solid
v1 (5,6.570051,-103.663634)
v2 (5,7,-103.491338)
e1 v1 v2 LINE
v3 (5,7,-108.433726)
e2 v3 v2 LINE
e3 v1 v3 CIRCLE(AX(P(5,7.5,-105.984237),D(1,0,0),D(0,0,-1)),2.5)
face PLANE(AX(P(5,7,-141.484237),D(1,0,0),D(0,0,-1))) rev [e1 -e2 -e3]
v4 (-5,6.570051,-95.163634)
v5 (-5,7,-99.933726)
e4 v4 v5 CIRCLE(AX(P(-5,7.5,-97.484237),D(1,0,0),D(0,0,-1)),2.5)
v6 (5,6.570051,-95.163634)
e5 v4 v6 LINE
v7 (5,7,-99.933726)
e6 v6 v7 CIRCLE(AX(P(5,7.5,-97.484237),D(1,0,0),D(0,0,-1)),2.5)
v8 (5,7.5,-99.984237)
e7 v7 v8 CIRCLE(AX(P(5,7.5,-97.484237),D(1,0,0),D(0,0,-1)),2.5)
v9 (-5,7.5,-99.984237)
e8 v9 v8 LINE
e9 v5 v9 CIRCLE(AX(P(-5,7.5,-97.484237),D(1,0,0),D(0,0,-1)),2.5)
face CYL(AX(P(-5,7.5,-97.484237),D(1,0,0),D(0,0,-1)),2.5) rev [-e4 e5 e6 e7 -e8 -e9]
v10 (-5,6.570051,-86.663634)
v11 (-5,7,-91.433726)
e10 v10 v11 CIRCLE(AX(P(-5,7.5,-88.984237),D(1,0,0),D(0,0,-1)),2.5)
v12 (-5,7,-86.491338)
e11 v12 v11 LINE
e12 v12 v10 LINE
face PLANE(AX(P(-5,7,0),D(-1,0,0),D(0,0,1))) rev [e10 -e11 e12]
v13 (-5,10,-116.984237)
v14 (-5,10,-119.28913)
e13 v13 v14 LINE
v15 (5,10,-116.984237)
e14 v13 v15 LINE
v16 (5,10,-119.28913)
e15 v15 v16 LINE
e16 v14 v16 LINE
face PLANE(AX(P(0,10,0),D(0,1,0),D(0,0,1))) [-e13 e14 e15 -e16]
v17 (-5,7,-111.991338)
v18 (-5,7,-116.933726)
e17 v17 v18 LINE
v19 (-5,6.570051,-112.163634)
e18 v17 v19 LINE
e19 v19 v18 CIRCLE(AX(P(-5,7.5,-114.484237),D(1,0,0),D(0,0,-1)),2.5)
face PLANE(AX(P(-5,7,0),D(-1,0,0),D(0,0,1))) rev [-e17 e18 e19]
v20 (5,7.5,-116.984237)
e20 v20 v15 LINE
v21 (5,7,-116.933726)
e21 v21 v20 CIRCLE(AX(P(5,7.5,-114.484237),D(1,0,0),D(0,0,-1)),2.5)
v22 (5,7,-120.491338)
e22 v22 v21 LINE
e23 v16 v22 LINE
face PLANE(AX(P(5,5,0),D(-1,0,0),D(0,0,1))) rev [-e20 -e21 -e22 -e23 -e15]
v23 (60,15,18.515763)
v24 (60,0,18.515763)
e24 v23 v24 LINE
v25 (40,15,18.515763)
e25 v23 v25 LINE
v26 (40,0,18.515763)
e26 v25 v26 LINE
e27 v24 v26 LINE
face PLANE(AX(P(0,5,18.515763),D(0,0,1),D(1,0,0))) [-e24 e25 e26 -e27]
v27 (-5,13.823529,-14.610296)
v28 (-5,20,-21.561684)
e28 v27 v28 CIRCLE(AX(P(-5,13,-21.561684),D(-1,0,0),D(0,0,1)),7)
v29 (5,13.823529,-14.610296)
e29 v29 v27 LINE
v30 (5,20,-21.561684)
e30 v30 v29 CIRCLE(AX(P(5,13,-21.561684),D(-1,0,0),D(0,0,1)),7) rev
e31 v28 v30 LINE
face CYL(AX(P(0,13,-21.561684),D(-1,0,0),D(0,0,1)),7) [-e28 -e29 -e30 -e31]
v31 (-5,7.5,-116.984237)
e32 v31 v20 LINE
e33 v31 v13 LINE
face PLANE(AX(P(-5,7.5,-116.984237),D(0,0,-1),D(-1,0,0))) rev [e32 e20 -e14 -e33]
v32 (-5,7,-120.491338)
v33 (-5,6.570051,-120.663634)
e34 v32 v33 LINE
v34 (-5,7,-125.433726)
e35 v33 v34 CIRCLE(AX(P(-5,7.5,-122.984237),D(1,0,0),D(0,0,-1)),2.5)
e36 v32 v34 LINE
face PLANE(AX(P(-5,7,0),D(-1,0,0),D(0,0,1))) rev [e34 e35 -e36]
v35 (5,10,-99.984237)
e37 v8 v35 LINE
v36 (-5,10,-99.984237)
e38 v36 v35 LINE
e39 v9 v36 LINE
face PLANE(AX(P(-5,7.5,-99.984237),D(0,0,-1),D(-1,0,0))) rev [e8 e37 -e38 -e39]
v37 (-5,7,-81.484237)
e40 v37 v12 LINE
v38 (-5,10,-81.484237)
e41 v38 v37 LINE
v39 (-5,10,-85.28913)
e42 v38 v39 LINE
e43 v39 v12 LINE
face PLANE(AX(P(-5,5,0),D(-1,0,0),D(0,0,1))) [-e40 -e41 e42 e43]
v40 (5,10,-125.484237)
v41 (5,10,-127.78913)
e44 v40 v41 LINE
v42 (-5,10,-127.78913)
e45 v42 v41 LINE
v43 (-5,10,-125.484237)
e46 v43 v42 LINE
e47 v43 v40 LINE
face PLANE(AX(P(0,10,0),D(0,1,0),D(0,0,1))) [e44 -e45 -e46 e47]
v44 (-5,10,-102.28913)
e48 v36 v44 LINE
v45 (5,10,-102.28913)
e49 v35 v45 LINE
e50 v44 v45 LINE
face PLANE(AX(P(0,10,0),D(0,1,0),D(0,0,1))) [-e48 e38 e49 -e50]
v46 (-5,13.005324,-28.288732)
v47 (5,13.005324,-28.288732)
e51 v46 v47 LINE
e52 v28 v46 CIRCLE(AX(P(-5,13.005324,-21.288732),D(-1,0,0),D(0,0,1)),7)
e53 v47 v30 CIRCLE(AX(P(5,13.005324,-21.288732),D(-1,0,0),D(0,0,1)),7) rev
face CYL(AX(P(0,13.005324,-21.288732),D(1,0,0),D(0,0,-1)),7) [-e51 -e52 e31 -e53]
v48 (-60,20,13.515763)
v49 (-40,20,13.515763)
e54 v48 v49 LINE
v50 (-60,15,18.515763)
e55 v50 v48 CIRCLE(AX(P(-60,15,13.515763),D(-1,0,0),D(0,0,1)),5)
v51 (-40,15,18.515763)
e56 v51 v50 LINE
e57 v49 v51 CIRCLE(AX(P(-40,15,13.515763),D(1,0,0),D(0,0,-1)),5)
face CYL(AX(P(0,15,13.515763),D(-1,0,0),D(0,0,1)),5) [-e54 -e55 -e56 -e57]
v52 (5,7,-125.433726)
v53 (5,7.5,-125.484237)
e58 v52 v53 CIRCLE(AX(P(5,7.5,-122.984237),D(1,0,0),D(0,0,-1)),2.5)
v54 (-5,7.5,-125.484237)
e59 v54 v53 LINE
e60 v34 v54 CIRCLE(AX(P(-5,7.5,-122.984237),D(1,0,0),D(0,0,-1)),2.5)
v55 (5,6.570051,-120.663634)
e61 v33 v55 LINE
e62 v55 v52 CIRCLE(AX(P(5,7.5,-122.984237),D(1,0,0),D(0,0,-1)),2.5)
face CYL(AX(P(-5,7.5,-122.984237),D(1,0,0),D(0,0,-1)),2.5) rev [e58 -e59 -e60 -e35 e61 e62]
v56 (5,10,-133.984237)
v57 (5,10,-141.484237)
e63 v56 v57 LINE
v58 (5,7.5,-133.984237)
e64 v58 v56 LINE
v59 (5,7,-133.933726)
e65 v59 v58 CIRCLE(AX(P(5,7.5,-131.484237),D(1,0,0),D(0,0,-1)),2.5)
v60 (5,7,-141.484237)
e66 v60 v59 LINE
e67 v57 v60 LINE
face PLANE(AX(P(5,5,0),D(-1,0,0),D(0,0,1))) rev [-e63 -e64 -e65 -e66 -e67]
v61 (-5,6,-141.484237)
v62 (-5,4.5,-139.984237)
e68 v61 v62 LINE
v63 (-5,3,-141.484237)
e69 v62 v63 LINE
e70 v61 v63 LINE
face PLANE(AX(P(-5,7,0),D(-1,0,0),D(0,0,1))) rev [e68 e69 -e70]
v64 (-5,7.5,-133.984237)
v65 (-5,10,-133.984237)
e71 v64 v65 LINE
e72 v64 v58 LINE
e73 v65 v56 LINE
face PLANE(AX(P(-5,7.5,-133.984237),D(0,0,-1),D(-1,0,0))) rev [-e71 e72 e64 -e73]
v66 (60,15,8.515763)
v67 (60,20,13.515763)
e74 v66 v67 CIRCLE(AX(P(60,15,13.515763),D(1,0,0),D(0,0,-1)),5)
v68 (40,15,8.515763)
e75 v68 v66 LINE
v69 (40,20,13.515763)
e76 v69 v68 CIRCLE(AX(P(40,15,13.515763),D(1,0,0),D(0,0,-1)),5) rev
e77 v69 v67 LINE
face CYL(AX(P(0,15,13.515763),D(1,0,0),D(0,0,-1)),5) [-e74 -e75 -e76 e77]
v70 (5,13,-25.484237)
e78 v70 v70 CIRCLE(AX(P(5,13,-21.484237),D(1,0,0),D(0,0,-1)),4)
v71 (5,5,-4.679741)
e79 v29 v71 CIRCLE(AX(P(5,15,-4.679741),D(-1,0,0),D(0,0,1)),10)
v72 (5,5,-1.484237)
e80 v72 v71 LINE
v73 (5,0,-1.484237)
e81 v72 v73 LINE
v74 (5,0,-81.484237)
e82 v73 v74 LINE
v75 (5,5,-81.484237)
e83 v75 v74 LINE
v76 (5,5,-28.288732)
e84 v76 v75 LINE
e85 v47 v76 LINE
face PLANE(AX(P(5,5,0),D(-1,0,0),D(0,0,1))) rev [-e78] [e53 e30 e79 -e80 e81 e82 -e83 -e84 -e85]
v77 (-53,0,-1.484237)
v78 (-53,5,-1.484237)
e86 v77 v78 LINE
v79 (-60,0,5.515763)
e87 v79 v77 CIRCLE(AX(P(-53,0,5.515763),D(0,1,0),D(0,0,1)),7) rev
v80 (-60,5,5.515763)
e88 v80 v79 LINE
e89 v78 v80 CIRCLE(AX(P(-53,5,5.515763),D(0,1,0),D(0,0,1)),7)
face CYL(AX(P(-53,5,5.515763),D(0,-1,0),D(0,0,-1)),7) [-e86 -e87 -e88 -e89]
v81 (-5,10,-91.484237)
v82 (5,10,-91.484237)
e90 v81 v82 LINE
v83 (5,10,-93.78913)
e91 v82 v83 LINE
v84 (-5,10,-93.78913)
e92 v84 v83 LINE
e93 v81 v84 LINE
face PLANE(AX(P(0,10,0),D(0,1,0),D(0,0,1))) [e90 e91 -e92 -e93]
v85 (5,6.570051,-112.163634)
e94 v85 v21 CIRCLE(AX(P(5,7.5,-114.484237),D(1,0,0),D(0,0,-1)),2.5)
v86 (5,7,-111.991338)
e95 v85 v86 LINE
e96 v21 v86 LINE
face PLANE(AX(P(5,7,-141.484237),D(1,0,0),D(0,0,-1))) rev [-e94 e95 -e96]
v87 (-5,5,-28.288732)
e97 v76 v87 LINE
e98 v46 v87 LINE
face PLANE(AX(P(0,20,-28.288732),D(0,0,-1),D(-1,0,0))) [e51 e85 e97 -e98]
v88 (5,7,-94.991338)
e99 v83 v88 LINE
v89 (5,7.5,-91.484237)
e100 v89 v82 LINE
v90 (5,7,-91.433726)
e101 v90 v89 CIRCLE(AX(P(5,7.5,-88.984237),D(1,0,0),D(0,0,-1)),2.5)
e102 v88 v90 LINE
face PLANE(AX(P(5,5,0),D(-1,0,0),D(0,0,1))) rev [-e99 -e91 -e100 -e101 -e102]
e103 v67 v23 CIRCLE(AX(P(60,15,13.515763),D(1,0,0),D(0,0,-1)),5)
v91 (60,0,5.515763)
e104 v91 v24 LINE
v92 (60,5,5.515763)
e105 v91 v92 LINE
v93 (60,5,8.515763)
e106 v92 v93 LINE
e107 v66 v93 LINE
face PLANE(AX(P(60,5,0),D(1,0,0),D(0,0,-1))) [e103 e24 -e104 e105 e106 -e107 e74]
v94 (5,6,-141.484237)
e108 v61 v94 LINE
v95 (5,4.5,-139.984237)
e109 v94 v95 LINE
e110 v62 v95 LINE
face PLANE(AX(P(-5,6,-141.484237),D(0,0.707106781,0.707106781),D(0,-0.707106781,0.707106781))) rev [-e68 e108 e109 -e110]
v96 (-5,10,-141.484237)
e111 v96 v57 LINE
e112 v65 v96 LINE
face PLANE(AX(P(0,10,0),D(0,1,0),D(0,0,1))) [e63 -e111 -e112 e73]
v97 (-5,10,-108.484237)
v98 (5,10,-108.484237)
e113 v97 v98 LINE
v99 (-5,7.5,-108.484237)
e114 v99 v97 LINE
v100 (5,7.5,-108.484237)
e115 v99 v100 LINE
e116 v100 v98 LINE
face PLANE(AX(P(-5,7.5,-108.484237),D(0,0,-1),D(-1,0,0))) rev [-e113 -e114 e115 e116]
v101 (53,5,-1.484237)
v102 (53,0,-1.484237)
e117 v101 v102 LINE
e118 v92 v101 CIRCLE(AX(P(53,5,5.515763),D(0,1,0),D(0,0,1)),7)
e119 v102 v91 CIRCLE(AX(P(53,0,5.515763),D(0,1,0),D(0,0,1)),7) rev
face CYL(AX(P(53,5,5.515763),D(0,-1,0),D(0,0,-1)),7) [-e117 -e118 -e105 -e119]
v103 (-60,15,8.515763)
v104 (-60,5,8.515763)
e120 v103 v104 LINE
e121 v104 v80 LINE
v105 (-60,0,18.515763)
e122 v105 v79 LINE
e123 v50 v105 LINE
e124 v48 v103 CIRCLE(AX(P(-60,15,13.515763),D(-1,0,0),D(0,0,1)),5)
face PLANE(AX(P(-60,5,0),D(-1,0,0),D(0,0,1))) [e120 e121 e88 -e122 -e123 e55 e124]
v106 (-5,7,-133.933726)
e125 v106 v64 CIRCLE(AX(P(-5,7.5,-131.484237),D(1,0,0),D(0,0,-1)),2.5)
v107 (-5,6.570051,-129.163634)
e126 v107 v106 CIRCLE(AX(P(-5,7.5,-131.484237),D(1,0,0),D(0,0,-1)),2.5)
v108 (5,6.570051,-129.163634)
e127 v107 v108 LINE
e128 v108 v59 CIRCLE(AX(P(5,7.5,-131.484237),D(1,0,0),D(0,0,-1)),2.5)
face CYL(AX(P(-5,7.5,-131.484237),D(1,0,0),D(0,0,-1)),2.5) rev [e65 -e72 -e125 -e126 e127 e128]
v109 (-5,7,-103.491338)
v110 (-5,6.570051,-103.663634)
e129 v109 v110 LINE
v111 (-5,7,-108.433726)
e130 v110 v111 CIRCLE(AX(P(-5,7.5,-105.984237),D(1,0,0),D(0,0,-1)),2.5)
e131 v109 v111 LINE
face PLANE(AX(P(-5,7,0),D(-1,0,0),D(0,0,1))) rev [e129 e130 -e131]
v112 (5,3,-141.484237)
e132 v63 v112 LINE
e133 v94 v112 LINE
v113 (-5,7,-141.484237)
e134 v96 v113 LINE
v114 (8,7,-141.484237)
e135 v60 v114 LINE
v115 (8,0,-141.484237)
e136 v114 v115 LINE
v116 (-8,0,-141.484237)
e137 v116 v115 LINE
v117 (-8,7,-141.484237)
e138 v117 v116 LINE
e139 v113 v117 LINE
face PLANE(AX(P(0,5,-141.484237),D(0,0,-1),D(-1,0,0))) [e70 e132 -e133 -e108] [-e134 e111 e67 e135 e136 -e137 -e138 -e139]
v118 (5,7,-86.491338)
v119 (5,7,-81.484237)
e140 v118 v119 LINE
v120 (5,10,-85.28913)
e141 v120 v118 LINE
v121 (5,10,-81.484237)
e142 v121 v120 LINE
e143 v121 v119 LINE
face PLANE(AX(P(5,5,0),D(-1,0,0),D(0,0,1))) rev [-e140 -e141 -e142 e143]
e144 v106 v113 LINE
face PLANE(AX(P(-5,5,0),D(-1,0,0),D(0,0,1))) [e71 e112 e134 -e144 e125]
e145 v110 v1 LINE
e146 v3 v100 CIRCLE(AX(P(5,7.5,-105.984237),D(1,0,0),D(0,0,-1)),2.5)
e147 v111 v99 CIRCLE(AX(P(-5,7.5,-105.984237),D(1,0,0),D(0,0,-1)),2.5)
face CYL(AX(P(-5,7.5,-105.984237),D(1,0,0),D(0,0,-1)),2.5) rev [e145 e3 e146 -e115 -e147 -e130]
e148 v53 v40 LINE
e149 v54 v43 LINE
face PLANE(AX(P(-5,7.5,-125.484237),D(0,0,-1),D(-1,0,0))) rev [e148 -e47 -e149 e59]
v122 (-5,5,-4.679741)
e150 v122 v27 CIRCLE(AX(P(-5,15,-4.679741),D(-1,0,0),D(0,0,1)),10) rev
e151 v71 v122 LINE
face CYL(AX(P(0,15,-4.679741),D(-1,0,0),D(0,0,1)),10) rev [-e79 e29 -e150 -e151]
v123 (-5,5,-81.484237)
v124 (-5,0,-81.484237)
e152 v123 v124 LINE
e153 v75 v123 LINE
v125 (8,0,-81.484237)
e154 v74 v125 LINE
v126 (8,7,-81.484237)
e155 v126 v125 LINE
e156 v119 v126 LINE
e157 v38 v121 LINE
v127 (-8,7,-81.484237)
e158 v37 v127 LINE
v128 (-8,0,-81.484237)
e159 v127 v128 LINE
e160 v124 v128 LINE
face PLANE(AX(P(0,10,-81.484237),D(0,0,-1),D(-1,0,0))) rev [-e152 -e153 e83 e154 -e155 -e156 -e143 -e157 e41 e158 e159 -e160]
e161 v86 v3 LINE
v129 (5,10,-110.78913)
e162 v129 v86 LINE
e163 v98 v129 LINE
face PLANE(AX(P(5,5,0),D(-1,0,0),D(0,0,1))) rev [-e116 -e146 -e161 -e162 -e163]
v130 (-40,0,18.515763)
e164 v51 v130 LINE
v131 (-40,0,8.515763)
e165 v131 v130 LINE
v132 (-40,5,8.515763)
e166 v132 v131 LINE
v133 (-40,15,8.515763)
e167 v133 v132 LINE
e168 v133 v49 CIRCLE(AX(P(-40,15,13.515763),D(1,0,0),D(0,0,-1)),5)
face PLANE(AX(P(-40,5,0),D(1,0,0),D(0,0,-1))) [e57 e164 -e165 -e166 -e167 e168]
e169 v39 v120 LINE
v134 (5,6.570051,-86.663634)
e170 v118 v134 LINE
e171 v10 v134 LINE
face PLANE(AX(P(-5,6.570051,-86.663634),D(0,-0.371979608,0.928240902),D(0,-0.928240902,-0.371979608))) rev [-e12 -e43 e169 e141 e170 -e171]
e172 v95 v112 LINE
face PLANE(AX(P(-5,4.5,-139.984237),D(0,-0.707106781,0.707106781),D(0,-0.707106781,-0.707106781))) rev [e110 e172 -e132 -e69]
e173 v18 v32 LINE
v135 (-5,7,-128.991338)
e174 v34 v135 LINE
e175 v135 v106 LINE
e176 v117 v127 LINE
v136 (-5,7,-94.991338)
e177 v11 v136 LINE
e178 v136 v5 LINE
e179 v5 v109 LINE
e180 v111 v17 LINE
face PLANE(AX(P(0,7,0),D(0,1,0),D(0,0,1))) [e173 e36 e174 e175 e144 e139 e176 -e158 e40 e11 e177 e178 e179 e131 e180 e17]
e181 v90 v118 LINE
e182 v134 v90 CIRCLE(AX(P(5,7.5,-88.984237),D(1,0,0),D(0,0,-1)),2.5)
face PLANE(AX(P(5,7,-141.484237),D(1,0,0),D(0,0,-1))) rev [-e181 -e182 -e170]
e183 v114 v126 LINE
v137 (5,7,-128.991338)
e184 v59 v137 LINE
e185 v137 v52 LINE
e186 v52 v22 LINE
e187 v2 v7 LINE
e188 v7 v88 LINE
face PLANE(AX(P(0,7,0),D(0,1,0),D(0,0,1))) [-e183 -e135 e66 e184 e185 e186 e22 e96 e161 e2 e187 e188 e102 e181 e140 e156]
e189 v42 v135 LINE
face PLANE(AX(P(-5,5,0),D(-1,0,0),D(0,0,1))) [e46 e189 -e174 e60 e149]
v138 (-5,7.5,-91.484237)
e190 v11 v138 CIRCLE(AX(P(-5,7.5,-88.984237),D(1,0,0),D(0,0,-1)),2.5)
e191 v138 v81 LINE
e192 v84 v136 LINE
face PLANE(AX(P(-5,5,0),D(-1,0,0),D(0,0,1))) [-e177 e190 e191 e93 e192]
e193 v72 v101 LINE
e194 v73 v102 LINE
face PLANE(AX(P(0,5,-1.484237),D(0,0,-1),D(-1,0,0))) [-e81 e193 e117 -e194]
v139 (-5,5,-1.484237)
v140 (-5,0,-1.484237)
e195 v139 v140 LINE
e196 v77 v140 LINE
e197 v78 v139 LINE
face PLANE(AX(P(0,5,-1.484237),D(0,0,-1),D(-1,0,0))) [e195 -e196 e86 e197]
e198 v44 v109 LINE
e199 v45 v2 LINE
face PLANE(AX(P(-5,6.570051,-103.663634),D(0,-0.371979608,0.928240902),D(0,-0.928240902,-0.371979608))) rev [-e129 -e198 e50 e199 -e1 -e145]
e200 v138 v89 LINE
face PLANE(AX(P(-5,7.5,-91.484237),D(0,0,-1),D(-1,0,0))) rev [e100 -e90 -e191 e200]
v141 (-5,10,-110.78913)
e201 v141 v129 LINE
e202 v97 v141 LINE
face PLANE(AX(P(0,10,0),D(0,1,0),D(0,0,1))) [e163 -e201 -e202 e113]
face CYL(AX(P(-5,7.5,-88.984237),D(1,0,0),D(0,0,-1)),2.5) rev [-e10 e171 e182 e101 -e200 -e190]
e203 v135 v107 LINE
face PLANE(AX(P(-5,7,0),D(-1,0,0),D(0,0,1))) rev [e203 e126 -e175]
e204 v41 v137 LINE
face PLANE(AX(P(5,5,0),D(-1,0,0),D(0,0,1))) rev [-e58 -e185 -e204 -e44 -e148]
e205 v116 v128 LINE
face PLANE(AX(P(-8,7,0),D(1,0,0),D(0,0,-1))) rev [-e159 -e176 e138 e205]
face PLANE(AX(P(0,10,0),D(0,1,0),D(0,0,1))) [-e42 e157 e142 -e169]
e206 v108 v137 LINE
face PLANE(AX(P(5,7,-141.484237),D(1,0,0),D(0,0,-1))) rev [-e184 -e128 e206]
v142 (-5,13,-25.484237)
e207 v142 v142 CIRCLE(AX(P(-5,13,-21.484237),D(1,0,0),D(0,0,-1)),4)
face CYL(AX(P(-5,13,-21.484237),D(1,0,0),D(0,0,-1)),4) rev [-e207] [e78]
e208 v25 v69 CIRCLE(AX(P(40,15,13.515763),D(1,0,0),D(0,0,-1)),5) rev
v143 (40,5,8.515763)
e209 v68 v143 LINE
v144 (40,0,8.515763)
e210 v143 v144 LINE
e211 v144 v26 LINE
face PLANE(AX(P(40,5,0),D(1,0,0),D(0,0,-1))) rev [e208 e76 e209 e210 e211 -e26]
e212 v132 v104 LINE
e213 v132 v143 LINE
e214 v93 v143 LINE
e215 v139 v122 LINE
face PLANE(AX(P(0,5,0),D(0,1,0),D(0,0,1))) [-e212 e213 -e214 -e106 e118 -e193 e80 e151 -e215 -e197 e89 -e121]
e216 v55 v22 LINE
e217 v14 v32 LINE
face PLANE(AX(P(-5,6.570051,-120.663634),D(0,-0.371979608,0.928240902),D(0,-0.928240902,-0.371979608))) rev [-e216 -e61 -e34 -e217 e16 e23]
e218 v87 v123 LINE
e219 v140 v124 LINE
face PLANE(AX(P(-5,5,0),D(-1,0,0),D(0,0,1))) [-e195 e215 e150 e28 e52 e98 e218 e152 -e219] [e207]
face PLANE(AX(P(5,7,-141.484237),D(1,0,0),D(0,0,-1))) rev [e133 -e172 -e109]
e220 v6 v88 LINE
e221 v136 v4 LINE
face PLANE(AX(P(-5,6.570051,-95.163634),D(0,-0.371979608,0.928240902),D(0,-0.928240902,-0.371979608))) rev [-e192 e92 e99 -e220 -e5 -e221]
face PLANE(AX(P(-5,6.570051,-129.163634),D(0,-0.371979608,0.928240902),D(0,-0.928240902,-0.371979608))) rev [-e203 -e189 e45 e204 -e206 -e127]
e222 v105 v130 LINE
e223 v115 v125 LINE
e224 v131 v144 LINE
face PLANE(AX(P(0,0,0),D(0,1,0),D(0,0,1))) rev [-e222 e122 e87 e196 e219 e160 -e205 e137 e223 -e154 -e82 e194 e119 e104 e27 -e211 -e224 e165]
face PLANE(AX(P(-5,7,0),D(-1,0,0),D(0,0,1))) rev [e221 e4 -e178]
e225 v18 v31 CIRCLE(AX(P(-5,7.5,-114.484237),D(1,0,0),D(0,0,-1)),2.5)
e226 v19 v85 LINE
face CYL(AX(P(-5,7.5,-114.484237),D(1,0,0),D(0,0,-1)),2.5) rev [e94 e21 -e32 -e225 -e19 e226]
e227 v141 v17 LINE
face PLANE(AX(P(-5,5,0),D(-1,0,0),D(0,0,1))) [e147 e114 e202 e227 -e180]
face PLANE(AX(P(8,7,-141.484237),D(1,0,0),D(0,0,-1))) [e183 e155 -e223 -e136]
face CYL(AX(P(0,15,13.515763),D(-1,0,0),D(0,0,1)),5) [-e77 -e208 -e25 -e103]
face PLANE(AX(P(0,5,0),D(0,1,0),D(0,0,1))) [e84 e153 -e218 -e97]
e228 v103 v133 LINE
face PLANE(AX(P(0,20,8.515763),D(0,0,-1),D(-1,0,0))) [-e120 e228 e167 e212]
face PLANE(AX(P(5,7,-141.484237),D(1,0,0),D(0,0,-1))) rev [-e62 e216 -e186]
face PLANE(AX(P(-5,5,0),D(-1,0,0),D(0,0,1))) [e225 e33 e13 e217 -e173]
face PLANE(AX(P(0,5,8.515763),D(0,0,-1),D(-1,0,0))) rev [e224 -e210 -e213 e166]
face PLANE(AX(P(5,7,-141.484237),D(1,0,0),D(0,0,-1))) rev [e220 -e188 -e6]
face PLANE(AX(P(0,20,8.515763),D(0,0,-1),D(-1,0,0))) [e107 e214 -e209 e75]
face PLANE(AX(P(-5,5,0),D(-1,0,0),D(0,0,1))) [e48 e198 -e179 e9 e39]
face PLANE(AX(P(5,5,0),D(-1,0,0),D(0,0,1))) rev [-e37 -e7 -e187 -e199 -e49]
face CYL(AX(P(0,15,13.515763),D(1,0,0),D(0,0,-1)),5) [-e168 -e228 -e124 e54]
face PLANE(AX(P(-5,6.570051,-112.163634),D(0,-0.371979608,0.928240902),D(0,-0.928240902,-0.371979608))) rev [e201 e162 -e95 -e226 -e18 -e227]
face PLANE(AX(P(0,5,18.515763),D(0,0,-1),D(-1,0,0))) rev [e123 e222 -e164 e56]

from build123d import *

# Parameters (mm, degrees)
BOSS_EXTRUDE1_DEPTH = 5
SKETCH1_3_W         = 20
SKETCH1_3_H         = 10
SKETCH1_3_W_2       = 10
SKETCH1_3_H_2       = 13.608990902
BOSS_EXTRUDE2_DEPTH = 20
SKETCH1_5_W         = 10
SKETCH1_5_H         = 60
BOSS_EXTRUDE3_DEPTH = 10
SKETCH3_R           = 4
CUT_EXTRUDE1_DEPTH  = 10
FILLET1_R           = 10
FILLET2_R           = 5
FILLET3_R           = 7
FILLET4_R           = 7
FILLET5_R           = 7
SKETCH1_6_W         = 3
SKETCH1_6_H         = 60
BOSS_EXTRUDE4_DEPTH = 7


# Some blends are built 0.0001 mm under size
with BuildPart() as part:
    # Sketch1 → Boss-Extrude1 (new body)
    with BuildSketch(Plane(origin=(0, 0, 0), x_dir=(1, 0, 0), z_dir=(0, 1, 0))):
        Polygon((40, -8.515763432), (40, -18.515763432), (60, -18.515763432), (60, 1.484236568), (5, 1.484236568), (5, 141.484236568), (-5, 141.484236568), (-5, 1.484236568), (-60, 1.484236568), (-60, -18.515763432), (-40, -18.515763432), (-40, -8.515763432), align=None)
    extrude(amount=BOSS_EXTRUDE1_DEPTH)

    # Sketch1<3> → Boss-Extrude2 (add)
    with BuildSketch(Plane(origin=(0, 0, 0), x_dir=(1, 0, 0), z_dir=(0, 1, 0))):
        with Locations((-50, -13.515763432)):
            Rectangle(SKETCH1_3_W, SKETCH1_3_H)
        Polygon((60, -8.515763432), (44.667493795, -8.515763432), (40, -8.515763432), (40, -18.515763432), (60, -18.515763432), align=None)
        with Locations((0, 21.484236568)):
            Rectangle(SKETCH1_3_W_2, SKETCH1_3_H_2)
    extrude(amount=BOSS_EXTRUDE2_DEPTH)

    # Sketch1<5> → Boss-Extrude3 (add)
    with BuildSketch(Plane(origin=(0, 0, 0), x_dir=(1, 0, 0), z_dir=(0, 1, 0))):
        with Locations((0, 111.484236568)):
            Rectangle(SKETCH1_5_W, SKETCH1_5_H)
    extrude(amount=BOSS_EXTRUDE3_DEPTH)

    # Sketch3 → Cut-Extrude1 (cut)
    with BuildSketch(Plane(origin=(5, 0, 0), x_dir=(0, 0, -1), z_dir=(1, 0, 0))):
        with Locations((21.484236568, 13)):
            Circle(SKETCH3_R)
        with BuildLine():
            Line((120.663634314, 6.570050981), (119.289130035, 10))
            Line((119.289130035, 10), (125.484236568, 10))
            Line((125.484236568, 10), (125.484236568, 7.5))
            ThreePointArc((125.484236568, 7.5), (123.457784012, 5.045259114), (120.663634314, 6.570050981))
        make_face()
        with BuildLine():
            Line((133.984236568, 7.5), (133.984236568, 10))
            Line((133.984236568, 10), (127.789130035, 10))
            Line((127.789130035, 10), (129.163634314, 6.570050981))
            ThreePointArc((129.163634314, 6.570050981), (131.957784012, 5.045259114), (133.984236568, 7.5))
        make_face()
        Polygon((141.484236568, 6), (139.984236568, 4.5), (141.484236568, 3), align=None)
        with BuildLine():
            Line((112.163634314, 6.570050981), (110.789130035, 10))
            Line((110.789130035, 10), (116.984236568, 10))
            Line((116.984236568, 10), (116.984236568, 7.5))
            ThreePointArc((116.984236568, 7.5), (114.957784012, 5.045259114), (112.163634314, 6.570050981))
        make_face()
        with BuildLine():
            Line((103.663634314, 6.570050981), (102.289130035, 10))
            Line((102.289130035, 10), (108.484236568, 10))
            Line((108.484236568, 10), (108.484236568, 7.5))
            ThreePointArc((108.484236568, 7.5), (106.457784012, 5.045259114), (103.663634314, 6.570050981))
        make_face()
        with BuildLine():
            Line((95.163634314, 6.570050981), (93.789130035, 10))
            Line((93.789130035, 10), (99.984236568, 10))
            Line((99.984236568, 10), (99.984236568, 7.5))
            ThreePointArc((99.984236568, 7.5), (97.957784012, 5.045259114), (95.163634314, 6.570050981))
        make_face()
        with BuildLine():
            Line((86.663634314, 6.570050981), (85.289130035, 10))
            Line((85.289130035, 10), (91.484236568, 10))
            Line((91.484236568, 10), (91.484236568, 7.5))
            ThreePointArc((91.484236568, 7.5), (89.457784012, 5.045259114), (86.663634314, 6.570050981))
        make_face()
    extrude(amount=-CUT_EXTRUDE1_DEPTH, mode=Mode.SUBTRACT)

    # Fillet1
    fillet1_edges = [part.edges().sort_by_distance(p)[0] for p in [
        (0, 5, -14.679741117),
    ]]
    fillet(fillet1_edges, radius=FILLET1_R)

    # Fillet2
    fillet2_edges = [part.edges().sort_by_distance(p)[0] for p in [
        (-50, 20, 8.515763432),
        (-50, 20, 18.515763432),
        (50, 20, 8.515763432),
        (50, 20, 18.515763432),
    ]]
    fillet(fillet2_edges, radius=FILLET2_R - 0.0001)  # a hair under: the kernel refuses the full size

    # Fillet3
    fillet3_edges = [part.edges().sort_by_distance(p)[0] for p in [
        (0, 20, -14.679741117),
    ]]
    fillet(fillet3_edges, radius=FILLET3_R)

    # Fillet4
    # the kernel refuses this fillet: 7 mm, written as the material it takes off along each edge
    with BuildSketch(Plane(origin=(22.486690858, 20, -28.288732019), x_dir=(0, 0, 1), z_dir=(-1, 0, 0))) as fillet4_piece_1:
        with BuildLine():
            CenterArc((7, -6.994676343), FILLET4_R, 92.234709992, 87.765290008)
            Line((0, -6.994676343), (-0.14, -6.994676343))
            Line((-0.14, -6.994676343), (-0.14, 0))
            Line((-0.14, 0), (0, 0.14))
            ThreePointArc((0, 0.14), (3.363523943, 0.14), (6.721588844, 0.139893527))
            Line((6.721588844, 0.139893527), (6.727047886, 0))
        make_face()
    extrude(amount=44.973381715, mode=Mode.SUBTRACT)

    # Fillet5
    fillet5_edges = [part.edges().sort_by_distance(p)[0] for p in [
        (-60, 2.5, -1.484236568),
        (60, 2.5, -1.484236568),
    ]]
    fillet(fillet5_edges, radius=FILLET5_R)

    # Sketch1<6> → Boss-Extrude4 (add)
    with BuildSketch(Plane(origin=(0, 0, 0), x_dir=(1, 0, 0), z_dir=(0, 1, 0))):
        with Locations((-6.5, 111.484236568)):
            Rectangle(SKETCH1_6_W, SKETCH1_6_H)
        with Locations((6.5, 111.484236568)):
            Rectangle(SKETCH1_6_W, SKETCH1_6_H)
    extrude(amount=BOSS_EXTRUDE4_DEPTH)


solid = part.part
